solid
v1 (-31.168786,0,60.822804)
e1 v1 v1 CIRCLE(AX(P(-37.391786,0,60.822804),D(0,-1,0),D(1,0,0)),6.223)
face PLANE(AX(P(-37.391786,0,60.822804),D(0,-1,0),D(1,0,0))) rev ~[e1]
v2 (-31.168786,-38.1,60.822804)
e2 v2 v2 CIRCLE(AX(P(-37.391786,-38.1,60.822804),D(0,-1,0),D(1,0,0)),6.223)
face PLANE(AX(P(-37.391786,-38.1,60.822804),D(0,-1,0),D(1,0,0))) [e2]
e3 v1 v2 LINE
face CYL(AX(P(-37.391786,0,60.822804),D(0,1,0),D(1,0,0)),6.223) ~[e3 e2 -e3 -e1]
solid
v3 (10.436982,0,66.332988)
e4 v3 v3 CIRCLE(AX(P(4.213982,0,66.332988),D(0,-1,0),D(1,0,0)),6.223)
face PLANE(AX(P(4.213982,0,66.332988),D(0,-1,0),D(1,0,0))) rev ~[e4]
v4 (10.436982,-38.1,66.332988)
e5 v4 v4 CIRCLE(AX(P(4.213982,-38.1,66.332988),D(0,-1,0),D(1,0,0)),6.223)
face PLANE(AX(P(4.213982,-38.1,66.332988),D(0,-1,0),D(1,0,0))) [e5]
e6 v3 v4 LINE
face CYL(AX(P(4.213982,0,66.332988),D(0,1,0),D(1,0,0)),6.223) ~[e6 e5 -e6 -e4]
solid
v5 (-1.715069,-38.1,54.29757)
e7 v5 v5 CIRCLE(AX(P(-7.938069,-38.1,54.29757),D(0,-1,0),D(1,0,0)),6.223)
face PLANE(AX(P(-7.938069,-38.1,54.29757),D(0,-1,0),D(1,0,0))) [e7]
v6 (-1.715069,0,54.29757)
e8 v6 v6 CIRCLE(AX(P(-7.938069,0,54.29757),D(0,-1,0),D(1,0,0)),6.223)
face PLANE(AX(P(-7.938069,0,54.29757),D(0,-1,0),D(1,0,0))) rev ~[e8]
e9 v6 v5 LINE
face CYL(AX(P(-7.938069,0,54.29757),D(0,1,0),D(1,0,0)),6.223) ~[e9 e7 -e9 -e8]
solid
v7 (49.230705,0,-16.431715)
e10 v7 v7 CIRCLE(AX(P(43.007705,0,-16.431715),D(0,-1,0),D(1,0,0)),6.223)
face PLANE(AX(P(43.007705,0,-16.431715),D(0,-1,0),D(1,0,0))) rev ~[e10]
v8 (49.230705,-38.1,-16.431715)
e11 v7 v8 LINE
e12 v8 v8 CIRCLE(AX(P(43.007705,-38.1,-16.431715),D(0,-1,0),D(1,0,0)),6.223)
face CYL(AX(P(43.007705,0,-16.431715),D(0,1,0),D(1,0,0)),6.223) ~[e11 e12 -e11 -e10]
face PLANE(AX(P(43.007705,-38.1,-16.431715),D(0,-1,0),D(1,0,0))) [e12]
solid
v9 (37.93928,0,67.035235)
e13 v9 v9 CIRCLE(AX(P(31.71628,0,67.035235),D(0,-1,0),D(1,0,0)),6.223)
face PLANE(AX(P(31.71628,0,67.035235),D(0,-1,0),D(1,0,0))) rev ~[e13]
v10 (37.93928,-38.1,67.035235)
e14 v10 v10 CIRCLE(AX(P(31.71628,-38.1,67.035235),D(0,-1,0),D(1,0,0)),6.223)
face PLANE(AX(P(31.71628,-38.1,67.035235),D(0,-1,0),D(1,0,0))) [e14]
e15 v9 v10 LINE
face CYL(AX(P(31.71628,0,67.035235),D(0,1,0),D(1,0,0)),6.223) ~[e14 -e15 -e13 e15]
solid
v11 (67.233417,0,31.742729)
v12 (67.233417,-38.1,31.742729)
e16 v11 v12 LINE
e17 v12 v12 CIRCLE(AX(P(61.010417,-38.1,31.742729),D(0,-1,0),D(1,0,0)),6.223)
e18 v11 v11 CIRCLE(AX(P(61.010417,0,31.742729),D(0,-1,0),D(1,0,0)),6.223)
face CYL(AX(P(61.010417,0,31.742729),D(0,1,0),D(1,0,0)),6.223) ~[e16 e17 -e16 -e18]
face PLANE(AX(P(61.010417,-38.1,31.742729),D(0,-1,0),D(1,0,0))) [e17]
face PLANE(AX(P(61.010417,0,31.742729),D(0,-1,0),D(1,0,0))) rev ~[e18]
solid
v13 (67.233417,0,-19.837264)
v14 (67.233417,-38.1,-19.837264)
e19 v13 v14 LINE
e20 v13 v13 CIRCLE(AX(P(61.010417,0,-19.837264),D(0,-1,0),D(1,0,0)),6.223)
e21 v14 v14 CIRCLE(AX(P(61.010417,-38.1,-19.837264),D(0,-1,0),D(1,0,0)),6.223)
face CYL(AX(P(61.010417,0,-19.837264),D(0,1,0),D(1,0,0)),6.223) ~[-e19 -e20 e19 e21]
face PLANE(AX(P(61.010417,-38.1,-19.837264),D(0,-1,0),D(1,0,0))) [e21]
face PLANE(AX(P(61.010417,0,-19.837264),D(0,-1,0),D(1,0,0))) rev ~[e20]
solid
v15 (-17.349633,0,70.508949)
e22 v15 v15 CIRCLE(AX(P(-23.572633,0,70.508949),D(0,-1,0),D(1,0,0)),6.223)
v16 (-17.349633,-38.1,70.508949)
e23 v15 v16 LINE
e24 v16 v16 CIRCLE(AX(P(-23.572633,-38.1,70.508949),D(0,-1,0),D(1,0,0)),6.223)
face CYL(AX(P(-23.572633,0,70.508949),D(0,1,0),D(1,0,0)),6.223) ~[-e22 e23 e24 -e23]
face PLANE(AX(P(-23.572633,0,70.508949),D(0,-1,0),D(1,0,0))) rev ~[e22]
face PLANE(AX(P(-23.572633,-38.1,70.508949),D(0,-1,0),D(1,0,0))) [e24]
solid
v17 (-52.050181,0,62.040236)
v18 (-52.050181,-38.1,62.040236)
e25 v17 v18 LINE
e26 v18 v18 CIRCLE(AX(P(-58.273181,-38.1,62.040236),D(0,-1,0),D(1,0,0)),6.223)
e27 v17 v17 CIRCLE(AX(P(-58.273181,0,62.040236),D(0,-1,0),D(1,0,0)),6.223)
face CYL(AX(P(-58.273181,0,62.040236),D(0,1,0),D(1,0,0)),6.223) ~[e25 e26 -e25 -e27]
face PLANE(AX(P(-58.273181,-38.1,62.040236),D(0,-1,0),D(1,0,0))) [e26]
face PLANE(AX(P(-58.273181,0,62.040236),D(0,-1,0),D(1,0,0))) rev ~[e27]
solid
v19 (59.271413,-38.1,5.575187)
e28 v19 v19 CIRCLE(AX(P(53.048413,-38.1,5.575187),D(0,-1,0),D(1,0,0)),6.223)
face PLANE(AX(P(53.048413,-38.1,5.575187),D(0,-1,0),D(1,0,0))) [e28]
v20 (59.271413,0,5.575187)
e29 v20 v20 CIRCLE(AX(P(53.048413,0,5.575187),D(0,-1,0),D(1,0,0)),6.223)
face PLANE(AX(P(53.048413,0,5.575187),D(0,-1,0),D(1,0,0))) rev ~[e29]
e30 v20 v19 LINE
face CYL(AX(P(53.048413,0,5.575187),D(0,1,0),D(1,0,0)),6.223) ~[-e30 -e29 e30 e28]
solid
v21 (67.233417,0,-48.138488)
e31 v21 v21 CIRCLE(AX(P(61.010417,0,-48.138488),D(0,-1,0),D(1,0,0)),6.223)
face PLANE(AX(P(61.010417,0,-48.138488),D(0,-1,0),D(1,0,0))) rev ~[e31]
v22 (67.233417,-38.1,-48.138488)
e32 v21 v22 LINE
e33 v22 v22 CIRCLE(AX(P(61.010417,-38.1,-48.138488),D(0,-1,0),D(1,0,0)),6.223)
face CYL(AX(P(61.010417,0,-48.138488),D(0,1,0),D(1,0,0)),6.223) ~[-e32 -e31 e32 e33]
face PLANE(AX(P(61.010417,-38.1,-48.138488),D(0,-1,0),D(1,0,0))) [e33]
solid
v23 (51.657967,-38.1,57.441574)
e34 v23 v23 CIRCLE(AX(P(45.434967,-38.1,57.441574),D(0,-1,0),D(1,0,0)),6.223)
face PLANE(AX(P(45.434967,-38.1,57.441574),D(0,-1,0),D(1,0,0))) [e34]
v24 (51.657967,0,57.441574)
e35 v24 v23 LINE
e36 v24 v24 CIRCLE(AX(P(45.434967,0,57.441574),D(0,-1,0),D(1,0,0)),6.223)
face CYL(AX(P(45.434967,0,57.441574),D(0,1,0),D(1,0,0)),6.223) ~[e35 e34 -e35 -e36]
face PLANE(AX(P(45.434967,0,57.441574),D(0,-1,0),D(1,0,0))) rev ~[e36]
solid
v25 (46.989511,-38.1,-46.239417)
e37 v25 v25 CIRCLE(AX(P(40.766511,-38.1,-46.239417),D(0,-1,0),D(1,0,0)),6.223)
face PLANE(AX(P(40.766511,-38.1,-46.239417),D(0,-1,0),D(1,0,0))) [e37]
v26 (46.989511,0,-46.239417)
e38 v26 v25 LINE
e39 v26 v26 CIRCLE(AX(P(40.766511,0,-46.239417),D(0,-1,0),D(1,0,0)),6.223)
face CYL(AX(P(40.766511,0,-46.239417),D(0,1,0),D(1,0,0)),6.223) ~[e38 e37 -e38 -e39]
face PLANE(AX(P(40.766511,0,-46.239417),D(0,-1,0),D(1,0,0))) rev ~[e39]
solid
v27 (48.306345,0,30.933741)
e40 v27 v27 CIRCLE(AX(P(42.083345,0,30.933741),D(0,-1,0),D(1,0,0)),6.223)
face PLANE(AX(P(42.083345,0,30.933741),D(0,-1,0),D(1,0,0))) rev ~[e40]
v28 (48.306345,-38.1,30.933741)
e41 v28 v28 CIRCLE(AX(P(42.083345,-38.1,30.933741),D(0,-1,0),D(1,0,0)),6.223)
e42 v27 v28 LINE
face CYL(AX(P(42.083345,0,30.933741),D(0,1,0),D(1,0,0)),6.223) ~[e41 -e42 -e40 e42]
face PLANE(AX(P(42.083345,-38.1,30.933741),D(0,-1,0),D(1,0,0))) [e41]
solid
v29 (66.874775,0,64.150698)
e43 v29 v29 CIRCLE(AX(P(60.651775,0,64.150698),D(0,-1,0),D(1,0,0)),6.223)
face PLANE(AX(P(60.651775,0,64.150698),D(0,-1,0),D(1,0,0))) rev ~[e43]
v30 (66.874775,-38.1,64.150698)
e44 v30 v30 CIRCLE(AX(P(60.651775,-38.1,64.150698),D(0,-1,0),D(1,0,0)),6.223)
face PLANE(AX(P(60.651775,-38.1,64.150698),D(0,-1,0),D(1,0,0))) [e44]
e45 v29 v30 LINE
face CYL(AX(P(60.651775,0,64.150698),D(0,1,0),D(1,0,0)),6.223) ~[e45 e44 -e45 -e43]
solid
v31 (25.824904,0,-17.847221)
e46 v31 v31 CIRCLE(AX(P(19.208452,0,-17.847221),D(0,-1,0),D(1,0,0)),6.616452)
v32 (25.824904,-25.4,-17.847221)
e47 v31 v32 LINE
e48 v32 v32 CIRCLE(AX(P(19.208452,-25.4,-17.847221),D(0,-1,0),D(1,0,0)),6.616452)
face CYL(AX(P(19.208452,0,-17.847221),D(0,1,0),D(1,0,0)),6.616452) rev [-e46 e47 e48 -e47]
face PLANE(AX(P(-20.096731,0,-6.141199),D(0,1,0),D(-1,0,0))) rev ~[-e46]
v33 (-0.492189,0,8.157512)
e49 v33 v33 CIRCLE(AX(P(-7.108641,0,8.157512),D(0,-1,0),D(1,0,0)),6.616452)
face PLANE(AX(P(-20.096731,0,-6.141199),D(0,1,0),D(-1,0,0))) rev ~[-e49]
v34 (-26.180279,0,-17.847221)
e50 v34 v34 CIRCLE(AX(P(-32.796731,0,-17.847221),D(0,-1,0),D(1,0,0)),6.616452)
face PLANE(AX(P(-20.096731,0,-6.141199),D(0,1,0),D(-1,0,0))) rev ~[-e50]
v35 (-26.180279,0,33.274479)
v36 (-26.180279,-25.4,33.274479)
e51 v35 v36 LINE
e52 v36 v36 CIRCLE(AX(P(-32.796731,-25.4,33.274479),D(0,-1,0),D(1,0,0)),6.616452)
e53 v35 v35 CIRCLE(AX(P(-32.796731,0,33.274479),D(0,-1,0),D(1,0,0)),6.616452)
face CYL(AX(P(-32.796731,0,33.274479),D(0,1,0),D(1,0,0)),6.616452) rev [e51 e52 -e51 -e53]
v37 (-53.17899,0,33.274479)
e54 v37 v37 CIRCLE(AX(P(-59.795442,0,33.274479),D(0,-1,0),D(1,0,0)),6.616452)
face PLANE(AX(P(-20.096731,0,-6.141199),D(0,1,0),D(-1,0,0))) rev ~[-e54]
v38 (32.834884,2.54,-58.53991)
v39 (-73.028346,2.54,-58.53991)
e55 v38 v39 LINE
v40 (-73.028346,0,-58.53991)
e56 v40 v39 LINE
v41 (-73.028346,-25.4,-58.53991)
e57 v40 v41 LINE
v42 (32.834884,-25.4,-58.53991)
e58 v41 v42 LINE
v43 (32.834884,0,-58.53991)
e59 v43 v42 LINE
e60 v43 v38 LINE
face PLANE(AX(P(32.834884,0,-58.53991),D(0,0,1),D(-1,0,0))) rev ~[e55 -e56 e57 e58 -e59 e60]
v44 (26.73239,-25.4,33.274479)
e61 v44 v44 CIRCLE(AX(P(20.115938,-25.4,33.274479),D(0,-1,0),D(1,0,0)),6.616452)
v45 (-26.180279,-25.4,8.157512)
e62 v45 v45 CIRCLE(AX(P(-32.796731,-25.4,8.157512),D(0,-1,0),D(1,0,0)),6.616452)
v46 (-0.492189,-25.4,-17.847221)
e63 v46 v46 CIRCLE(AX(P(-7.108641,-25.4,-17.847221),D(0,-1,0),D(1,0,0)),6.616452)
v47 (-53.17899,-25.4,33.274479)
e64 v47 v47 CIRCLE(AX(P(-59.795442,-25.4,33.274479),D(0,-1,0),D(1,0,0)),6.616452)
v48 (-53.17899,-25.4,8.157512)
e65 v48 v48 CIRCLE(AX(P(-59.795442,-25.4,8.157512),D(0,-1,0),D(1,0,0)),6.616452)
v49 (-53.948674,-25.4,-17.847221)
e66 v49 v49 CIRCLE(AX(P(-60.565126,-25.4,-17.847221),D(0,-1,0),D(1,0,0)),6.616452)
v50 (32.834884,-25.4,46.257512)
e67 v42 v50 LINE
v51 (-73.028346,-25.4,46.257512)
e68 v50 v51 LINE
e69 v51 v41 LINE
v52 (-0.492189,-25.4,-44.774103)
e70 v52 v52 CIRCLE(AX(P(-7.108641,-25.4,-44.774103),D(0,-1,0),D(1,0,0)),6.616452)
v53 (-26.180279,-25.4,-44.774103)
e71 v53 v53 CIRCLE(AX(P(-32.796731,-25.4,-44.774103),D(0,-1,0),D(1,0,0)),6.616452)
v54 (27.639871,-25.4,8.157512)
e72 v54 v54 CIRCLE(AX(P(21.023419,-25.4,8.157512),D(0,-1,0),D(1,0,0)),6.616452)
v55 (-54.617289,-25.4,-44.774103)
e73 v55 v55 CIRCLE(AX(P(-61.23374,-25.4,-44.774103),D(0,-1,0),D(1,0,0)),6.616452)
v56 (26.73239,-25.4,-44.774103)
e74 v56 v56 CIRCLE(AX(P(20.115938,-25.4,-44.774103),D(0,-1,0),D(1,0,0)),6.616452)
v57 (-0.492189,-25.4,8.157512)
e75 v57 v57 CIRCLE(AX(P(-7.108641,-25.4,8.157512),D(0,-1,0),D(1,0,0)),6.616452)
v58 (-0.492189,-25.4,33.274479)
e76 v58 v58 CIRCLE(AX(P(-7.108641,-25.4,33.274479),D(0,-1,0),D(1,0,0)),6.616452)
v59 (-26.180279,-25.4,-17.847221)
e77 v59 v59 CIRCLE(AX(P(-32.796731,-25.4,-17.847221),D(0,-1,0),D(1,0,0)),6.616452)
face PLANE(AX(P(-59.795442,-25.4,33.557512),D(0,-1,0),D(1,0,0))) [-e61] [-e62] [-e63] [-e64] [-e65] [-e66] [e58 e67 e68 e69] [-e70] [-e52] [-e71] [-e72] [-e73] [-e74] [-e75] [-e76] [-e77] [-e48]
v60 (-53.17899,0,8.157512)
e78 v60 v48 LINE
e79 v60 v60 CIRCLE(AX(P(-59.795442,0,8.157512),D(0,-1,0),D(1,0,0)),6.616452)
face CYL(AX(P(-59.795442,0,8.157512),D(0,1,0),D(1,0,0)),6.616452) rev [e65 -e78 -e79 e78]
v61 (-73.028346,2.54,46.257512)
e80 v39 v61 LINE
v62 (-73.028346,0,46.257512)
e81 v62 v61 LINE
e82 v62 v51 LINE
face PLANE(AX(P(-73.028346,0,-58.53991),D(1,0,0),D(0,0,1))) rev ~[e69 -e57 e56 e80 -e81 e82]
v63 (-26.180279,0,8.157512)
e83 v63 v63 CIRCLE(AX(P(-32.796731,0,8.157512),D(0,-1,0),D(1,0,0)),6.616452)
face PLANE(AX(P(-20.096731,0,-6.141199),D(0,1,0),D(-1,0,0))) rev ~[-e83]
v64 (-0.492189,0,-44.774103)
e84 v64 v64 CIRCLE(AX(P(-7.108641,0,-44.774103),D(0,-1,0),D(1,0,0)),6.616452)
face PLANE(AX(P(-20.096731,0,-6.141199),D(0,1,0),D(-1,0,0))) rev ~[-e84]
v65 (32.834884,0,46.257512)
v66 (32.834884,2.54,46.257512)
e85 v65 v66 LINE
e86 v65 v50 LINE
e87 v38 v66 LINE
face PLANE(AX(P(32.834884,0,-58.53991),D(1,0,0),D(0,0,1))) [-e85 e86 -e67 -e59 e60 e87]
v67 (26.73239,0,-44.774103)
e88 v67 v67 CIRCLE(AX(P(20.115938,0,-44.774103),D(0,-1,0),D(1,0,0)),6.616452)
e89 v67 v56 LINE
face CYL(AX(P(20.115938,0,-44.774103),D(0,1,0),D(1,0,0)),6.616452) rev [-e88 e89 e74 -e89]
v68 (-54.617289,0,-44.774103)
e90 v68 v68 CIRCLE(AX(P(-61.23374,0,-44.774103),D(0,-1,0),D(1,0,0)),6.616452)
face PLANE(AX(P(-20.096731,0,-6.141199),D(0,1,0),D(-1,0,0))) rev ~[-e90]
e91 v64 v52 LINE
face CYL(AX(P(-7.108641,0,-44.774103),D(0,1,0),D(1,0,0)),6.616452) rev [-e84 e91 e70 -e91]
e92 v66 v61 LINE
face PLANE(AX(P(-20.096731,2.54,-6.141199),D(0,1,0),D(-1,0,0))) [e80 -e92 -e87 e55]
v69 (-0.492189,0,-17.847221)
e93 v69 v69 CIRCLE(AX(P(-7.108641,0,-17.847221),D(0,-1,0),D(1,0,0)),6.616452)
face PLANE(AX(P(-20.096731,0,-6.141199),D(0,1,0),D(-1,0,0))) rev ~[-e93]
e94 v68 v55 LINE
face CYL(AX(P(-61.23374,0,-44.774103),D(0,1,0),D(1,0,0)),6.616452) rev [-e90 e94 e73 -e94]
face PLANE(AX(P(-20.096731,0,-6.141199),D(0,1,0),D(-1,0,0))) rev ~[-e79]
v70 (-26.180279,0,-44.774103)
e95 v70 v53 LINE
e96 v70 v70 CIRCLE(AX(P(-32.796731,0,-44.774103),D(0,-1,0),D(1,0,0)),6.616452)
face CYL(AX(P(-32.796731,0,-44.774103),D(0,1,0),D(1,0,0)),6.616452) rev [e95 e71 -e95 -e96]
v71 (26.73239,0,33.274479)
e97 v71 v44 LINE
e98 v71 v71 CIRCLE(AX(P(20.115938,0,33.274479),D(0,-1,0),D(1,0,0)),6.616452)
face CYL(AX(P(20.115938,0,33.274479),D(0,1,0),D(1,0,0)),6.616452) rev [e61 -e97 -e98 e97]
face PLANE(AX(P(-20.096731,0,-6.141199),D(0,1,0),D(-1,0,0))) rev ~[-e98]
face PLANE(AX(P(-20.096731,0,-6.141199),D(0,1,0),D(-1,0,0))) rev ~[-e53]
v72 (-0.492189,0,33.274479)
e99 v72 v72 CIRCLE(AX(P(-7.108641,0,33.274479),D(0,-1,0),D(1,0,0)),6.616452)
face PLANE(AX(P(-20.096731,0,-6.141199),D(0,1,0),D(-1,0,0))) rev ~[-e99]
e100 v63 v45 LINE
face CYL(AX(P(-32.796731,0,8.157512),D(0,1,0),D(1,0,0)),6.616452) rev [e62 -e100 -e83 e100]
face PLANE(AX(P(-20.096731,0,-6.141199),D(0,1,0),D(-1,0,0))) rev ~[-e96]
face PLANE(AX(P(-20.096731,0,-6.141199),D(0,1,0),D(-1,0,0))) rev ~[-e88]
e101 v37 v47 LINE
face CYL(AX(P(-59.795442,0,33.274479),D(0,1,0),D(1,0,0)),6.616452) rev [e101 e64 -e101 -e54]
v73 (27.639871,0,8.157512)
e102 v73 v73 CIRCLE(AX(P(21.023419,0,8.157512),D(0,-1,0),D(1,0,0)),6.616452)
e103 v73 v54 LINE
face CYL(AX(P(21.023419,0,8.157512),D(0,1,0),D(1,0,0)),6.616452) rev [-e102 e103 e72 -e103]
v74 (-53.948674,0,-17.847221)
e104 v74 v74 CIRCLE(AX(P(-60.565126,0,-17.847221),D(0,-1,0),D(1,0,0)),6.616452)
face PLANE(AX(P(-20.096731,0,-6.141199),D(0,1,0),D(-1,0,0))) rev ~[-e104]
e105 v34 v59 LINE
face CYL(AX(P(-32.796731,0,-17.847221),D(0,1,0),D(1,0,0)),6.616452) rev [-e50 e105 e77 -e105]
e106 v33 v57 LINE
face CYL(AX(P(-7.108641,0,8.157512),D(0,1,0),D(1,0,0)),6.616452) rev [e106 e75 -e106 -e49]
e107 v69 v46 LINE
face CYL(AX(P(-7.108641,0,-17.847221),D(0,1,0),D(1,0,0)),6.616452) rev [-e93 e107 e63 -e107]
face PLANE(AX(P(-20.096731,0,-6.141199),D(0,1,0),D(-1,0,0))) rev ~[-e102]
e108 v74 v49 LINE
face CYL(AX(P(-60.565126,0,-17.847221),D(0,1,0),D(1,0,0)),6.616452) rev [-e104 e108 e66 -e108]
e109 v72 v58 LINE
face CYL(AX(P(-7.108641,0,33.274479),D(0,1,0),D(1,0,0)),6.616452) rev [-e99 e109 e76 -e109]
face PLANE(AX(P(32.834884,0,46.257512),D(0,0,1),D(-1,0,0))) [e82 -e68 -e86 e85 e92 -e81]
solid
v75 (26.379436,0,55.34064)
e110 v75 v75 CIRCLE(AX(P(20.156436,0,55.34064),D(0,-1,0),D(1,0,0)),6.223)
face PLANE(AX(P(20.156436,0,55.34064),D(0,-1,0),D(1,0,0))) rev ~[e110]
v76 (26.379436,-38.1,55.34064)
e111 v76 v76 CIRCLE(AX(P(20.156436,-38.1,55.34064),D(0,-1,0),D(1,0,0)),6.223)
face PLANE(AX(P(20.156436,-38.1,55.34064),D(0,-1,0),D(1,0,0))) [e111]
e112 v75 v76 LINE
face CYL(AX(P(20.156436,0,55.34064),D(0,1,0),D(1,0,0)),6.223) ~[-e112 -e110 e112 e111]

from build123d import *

# Parameters (mm, degrees)
F0_W     = 26.4658074026
F0_H     = 25.4
F0_R     = 6.6164518507
F0_H_2   = 26.4658074026
F1_DEPTH = 25.4
F2_W     = 105.8632296105
F2_H     = 104.7974222079
F3_DEPTH = 2.54
F4_R     = 6.223
F5_DEPTH = 38.1


# Not quite as in the source:
# - a feature names something its author has since deleted; it is built from what else it names


with BuildPart() as f1:
    # F0 (on Front) → F1 (new body)
    with BuildSketch(Plane.XZ):
        with Locations((-59.7954421587, 33.5575119803)):
            Rectangle(F0_W, F0_H)
        with Locations((-59.7954421587, 33.2744792104)):
            Circle(F0_R, mode=Mode.SUBTRACT)
        with Locations((19.6019800492, 33.5575119803)):
            Rectangle(F0_W, F0_H)
        with Locations((20.1159380376, 33.2744792104)):
            Circle(F0_R, mode=Mode.SUBTRACT)
        with Locations((-59.7954421587, -45.3070065262)):
            Rectangle(F0_W, F0_H_2)
        with Locations((-61.233740398, -44.7741028249)):
            Circle(F0_R, mode=Mode.SUBTRACT)
        with Locations((19.6019800492, -45.3070065262)):
            Rectangle(F0_W, F0_H_2)
        with Locations((20.1159380376, -44.7741028249)):
            Circle(F0_R, mode=Mode.SUBTRACT)
        with Locations((-6.8638273535, 33.5575119803)):
            Rectangle(F0_W, F0_H)
        with Locations((-7.108640857, 33.2744792104)):
            Circle(F0_R, mode=Mode.SUBTRACT)
        with Locations((-33.3296347561, -45.3070065262)):
            Rectangle(F0_W, F0_H_2)
        with Locations((-32.7967310548, -44.7741028249)):
            Circle(F0_R, mode=Mode.SUBTRACT)
        with Locations((-6.8638273535, -45.3070065262)):
            Rectangle(F0_W, F0_H_2)
        with Locations((-7.108640857, -44.7741028249)):
            Circle(F0_R, mode=Mode.SUBTRACT)
        with Locations((-59.7954421587, 7.624608279)):
            Rectangle(F0_W, F0_H_2)
        with Locations((-59.7954421587, 8.1575119803)):
            Circle(F0_R, mode=Mode.SUBTRACT)
        with Locations((-59.7954421587, -18.8411991236)):
            Rectangle(F0_W, F0_H_2)
        with Locations((-60.5651258442, -17.8472213447)):
            Circle(F0_R, mode=Mode.SUBTRACT)
        with Locations((19.6019800492, 7.624608279)):
            Rectangle(F0_W, F0_H_2)
        with Locations((21.0234187543, 8.1575119803)):
            Circle(F0_R, mode=Mode.SUBTRACT)
        with Locations((19.6019800492, -18.8411991236)):
            Rectangle(F0_W, F0_H_2)
        with Locations((19.208451733, -17.8472213447)):
            Circle(F0_R, mode=Mode.SUBTRACT)
        with Locations((-33.3296347561, 7.624608279)):
            Rectangle(F0_W, F0_H_2)
        with Locations((-32.7967310548, 8.1575119803)):
            Circle(F0_R, mode=Mode.SUBTRACT)
        with Locations((-6.8638273535, 7.624608279)):
            Rectangle(F0_W, F0_H_2)
        with Locations((-7.108640857, 8.1575119803)):
            Circle(F0_R, mode=Mode.SUBTRACT)
        with Locations((-6.8638273535, -18.8411991236)):
            Rectangle(F0_W, F0_H_2)
        with Locations((-7.108640857, -17.8472213447)):
            Circle(F0_R, mode=Mode.SUBTRACT)
        with Locations((-33.3296347561, -18.8411991236)):
            Rectangle(F0_W, F0_H_2)
        with Locations((-32.7967310548, -17.8472213447)):
            Circle(F0_R, mode=Mode.SUBTRACT)
        with Locations((-33.3296347561, 33.5575119803)):
            Rectangle(F0_W, F0_H)
        with Locations((-32.7967310548, 33.2744792104)):
            Circle(F0_R, mode=Mode.SUBTRACT)
    extrude(amount=F1_DEPTH)

    # F2 (on face) → F3 (join)
    with BuildSketch(Plane(origin=(0, 0, 0), x_dir=(-1, 0, 0), z_dir=(0, 1, 0))):
        with Locations((20.0967310548, -6.1411991236)):
            Rectangle(F2_W, F2_H)
    extrude(amount=F3_DEPTH)


with BuildPart() as f5:
    # F4 (on Front) → F5 (new body)
    with BuildSketch(Plane.XZ):
        with Locations((-58.2731813192, 62.0402358472)):
            Circle(F4_R)
    extrude(amount=F5_DEPTH)


with BuildPart() as f5b:
    # F4 (on Front) → F5, piece 2 (new body)
    with BuildSketch(Plane.XZ):
        with Locations((-37.3917855322, 60.8228035271)):
            Circle(F4_R)
    extrude(amount=F5_DEPTH)


with BuildPart() as f5c:
    # F4 (on Front) → F5, piece 3 (new body)
    with BuildSketch(Plane.XZ):
        with Locations((-23.5726330429, 70.5089494586)):
            Circle(F4_R)
    extrude(amount=F5_DEPTH)


with BuildPart() as f5d:
    # F4 (on Front) → F5, piece 4 (new body)
    with BuildSketch(Plane.XZ):
        with Locations((-7.9380692914, 54.2975701392)):
            Circle(F4_R)
    extrude(amount=F5_DEPTH)


with BuildPart() as f5e:
    # F4 (on Front) → F5, piece 5 (new body)
    with BuildSketch(Plane.XZ):
        with Locations((4.2139817961, 66.332988441)):
            Circle(F4_R)
    extrude(amount=F5_DEPTH)


with BuildPart() as f5f:
    # F4 (on Front) → F5, piece 6 (new body)
    with BuildSketch(Plane.XZ):
        with Locations((20.1564356685, 55.3406402469)):
            Circle(F4_R)
    extrude(amount=F5_DEPTH)


with BuildPart() as f5g:
    # F4 (on Front) → F5, piece 7 (new body)
    with BuildSketch(Plane.XZ):
        with Locations((31.7162796855, 67.0352354646)):
            Circle(F4_R)
    extrude(amount=F5_DEPTH)


with BuildPart() as f5h:
    # F4 (on Front) → F5, piece 8 (new body)
    with BuildSketch(Plane.XZ):
        with Locations((45.4349666834, 57.44157359)):
            Circle(F4_R)
    extrude(amount=F5_DEPTH)


with BuildPart() as f5i:
    # F4 (on Front) → F5, piece 9 (new body)
    with BuildSketch(Plane.XZ):
        with Locations((60.6517754495, 64.150698483)):
            Circle(F4_R)
    extrude(amount=F5_DEPTH)


with BuildPart() as f5j:
    # F4 (on Front) → F5, piece 10 (new body)
    with BuildSketch(Plane.XZ):
        with Locations((42.0833453536, 30.9337414801)):
            Circle(F4_R)
    extrude(amount=F5_DEPTH)


with BuildPart() as f5k:
    # F4 (on Front) → F5, piece 11 (new body)
    with BuildSketch(Plane.XZ):
        with Locations((61.0104165971, 31.7427292466)):
            Circle(F4_R)
    extrude(amount=F5_DEPTH)


with BuildPart() as f5l:
    # F4 (on Front) → F5, piece 12 (new body)
    with BuildSketch(Plane.XZ):
        with Locations((53.0484132469, 5.575186573)):
            Circle(F4_R)
    extrude(amount=F5_DEPTH)


with BuildPart() as f5m:
    # F4 (on Front) → F5, piece 13 (new body)
    with BuildSketch(Plane.XZ):
        with Locations((43.0077053607, -16.4317153394)):
            Circle(F4_R)
    extrude(amount=F5_DEPTH)


with BuildPart() as f5n:
    # F4 (on Front) → F5, piece 14 (new body)
    with BuildSketch(Plane.XZ):
        with Locations((61.0104165971, -19.8372639716)):
            Circle(F4_R)
    extrude(amount=F5_DEPTH)


with BuildPart() as f5o:
    # F4 (on Front) → F5, piece 15 (new body)
    with BuildSketch(Plane.XZ):
        with Locations((40.7665111125, -46.2394170463)):
            Circle(F4_R)
    extrude(amount=F5_DEPTH)


with BuildPart() as f5p:
    # F4 (on Front) → F5, piece 16 (new body)
    with BuildSketch(Plane.XZ):
        with Locations((61.0104165971, -48.1384880841)):
            Circle(F4_R)
    extrude(amount=F5_DEPTH)


solid = Compound([f1.part, f5.part, f5b.part, f5c.part, f5d.part, f5e.part, f5f.part, f5g.part, f5h.part, f5i.part, f5j.part, f5k.part, f5l.part, f5m.part, f5n.part, f5o.part, f5p.part])
